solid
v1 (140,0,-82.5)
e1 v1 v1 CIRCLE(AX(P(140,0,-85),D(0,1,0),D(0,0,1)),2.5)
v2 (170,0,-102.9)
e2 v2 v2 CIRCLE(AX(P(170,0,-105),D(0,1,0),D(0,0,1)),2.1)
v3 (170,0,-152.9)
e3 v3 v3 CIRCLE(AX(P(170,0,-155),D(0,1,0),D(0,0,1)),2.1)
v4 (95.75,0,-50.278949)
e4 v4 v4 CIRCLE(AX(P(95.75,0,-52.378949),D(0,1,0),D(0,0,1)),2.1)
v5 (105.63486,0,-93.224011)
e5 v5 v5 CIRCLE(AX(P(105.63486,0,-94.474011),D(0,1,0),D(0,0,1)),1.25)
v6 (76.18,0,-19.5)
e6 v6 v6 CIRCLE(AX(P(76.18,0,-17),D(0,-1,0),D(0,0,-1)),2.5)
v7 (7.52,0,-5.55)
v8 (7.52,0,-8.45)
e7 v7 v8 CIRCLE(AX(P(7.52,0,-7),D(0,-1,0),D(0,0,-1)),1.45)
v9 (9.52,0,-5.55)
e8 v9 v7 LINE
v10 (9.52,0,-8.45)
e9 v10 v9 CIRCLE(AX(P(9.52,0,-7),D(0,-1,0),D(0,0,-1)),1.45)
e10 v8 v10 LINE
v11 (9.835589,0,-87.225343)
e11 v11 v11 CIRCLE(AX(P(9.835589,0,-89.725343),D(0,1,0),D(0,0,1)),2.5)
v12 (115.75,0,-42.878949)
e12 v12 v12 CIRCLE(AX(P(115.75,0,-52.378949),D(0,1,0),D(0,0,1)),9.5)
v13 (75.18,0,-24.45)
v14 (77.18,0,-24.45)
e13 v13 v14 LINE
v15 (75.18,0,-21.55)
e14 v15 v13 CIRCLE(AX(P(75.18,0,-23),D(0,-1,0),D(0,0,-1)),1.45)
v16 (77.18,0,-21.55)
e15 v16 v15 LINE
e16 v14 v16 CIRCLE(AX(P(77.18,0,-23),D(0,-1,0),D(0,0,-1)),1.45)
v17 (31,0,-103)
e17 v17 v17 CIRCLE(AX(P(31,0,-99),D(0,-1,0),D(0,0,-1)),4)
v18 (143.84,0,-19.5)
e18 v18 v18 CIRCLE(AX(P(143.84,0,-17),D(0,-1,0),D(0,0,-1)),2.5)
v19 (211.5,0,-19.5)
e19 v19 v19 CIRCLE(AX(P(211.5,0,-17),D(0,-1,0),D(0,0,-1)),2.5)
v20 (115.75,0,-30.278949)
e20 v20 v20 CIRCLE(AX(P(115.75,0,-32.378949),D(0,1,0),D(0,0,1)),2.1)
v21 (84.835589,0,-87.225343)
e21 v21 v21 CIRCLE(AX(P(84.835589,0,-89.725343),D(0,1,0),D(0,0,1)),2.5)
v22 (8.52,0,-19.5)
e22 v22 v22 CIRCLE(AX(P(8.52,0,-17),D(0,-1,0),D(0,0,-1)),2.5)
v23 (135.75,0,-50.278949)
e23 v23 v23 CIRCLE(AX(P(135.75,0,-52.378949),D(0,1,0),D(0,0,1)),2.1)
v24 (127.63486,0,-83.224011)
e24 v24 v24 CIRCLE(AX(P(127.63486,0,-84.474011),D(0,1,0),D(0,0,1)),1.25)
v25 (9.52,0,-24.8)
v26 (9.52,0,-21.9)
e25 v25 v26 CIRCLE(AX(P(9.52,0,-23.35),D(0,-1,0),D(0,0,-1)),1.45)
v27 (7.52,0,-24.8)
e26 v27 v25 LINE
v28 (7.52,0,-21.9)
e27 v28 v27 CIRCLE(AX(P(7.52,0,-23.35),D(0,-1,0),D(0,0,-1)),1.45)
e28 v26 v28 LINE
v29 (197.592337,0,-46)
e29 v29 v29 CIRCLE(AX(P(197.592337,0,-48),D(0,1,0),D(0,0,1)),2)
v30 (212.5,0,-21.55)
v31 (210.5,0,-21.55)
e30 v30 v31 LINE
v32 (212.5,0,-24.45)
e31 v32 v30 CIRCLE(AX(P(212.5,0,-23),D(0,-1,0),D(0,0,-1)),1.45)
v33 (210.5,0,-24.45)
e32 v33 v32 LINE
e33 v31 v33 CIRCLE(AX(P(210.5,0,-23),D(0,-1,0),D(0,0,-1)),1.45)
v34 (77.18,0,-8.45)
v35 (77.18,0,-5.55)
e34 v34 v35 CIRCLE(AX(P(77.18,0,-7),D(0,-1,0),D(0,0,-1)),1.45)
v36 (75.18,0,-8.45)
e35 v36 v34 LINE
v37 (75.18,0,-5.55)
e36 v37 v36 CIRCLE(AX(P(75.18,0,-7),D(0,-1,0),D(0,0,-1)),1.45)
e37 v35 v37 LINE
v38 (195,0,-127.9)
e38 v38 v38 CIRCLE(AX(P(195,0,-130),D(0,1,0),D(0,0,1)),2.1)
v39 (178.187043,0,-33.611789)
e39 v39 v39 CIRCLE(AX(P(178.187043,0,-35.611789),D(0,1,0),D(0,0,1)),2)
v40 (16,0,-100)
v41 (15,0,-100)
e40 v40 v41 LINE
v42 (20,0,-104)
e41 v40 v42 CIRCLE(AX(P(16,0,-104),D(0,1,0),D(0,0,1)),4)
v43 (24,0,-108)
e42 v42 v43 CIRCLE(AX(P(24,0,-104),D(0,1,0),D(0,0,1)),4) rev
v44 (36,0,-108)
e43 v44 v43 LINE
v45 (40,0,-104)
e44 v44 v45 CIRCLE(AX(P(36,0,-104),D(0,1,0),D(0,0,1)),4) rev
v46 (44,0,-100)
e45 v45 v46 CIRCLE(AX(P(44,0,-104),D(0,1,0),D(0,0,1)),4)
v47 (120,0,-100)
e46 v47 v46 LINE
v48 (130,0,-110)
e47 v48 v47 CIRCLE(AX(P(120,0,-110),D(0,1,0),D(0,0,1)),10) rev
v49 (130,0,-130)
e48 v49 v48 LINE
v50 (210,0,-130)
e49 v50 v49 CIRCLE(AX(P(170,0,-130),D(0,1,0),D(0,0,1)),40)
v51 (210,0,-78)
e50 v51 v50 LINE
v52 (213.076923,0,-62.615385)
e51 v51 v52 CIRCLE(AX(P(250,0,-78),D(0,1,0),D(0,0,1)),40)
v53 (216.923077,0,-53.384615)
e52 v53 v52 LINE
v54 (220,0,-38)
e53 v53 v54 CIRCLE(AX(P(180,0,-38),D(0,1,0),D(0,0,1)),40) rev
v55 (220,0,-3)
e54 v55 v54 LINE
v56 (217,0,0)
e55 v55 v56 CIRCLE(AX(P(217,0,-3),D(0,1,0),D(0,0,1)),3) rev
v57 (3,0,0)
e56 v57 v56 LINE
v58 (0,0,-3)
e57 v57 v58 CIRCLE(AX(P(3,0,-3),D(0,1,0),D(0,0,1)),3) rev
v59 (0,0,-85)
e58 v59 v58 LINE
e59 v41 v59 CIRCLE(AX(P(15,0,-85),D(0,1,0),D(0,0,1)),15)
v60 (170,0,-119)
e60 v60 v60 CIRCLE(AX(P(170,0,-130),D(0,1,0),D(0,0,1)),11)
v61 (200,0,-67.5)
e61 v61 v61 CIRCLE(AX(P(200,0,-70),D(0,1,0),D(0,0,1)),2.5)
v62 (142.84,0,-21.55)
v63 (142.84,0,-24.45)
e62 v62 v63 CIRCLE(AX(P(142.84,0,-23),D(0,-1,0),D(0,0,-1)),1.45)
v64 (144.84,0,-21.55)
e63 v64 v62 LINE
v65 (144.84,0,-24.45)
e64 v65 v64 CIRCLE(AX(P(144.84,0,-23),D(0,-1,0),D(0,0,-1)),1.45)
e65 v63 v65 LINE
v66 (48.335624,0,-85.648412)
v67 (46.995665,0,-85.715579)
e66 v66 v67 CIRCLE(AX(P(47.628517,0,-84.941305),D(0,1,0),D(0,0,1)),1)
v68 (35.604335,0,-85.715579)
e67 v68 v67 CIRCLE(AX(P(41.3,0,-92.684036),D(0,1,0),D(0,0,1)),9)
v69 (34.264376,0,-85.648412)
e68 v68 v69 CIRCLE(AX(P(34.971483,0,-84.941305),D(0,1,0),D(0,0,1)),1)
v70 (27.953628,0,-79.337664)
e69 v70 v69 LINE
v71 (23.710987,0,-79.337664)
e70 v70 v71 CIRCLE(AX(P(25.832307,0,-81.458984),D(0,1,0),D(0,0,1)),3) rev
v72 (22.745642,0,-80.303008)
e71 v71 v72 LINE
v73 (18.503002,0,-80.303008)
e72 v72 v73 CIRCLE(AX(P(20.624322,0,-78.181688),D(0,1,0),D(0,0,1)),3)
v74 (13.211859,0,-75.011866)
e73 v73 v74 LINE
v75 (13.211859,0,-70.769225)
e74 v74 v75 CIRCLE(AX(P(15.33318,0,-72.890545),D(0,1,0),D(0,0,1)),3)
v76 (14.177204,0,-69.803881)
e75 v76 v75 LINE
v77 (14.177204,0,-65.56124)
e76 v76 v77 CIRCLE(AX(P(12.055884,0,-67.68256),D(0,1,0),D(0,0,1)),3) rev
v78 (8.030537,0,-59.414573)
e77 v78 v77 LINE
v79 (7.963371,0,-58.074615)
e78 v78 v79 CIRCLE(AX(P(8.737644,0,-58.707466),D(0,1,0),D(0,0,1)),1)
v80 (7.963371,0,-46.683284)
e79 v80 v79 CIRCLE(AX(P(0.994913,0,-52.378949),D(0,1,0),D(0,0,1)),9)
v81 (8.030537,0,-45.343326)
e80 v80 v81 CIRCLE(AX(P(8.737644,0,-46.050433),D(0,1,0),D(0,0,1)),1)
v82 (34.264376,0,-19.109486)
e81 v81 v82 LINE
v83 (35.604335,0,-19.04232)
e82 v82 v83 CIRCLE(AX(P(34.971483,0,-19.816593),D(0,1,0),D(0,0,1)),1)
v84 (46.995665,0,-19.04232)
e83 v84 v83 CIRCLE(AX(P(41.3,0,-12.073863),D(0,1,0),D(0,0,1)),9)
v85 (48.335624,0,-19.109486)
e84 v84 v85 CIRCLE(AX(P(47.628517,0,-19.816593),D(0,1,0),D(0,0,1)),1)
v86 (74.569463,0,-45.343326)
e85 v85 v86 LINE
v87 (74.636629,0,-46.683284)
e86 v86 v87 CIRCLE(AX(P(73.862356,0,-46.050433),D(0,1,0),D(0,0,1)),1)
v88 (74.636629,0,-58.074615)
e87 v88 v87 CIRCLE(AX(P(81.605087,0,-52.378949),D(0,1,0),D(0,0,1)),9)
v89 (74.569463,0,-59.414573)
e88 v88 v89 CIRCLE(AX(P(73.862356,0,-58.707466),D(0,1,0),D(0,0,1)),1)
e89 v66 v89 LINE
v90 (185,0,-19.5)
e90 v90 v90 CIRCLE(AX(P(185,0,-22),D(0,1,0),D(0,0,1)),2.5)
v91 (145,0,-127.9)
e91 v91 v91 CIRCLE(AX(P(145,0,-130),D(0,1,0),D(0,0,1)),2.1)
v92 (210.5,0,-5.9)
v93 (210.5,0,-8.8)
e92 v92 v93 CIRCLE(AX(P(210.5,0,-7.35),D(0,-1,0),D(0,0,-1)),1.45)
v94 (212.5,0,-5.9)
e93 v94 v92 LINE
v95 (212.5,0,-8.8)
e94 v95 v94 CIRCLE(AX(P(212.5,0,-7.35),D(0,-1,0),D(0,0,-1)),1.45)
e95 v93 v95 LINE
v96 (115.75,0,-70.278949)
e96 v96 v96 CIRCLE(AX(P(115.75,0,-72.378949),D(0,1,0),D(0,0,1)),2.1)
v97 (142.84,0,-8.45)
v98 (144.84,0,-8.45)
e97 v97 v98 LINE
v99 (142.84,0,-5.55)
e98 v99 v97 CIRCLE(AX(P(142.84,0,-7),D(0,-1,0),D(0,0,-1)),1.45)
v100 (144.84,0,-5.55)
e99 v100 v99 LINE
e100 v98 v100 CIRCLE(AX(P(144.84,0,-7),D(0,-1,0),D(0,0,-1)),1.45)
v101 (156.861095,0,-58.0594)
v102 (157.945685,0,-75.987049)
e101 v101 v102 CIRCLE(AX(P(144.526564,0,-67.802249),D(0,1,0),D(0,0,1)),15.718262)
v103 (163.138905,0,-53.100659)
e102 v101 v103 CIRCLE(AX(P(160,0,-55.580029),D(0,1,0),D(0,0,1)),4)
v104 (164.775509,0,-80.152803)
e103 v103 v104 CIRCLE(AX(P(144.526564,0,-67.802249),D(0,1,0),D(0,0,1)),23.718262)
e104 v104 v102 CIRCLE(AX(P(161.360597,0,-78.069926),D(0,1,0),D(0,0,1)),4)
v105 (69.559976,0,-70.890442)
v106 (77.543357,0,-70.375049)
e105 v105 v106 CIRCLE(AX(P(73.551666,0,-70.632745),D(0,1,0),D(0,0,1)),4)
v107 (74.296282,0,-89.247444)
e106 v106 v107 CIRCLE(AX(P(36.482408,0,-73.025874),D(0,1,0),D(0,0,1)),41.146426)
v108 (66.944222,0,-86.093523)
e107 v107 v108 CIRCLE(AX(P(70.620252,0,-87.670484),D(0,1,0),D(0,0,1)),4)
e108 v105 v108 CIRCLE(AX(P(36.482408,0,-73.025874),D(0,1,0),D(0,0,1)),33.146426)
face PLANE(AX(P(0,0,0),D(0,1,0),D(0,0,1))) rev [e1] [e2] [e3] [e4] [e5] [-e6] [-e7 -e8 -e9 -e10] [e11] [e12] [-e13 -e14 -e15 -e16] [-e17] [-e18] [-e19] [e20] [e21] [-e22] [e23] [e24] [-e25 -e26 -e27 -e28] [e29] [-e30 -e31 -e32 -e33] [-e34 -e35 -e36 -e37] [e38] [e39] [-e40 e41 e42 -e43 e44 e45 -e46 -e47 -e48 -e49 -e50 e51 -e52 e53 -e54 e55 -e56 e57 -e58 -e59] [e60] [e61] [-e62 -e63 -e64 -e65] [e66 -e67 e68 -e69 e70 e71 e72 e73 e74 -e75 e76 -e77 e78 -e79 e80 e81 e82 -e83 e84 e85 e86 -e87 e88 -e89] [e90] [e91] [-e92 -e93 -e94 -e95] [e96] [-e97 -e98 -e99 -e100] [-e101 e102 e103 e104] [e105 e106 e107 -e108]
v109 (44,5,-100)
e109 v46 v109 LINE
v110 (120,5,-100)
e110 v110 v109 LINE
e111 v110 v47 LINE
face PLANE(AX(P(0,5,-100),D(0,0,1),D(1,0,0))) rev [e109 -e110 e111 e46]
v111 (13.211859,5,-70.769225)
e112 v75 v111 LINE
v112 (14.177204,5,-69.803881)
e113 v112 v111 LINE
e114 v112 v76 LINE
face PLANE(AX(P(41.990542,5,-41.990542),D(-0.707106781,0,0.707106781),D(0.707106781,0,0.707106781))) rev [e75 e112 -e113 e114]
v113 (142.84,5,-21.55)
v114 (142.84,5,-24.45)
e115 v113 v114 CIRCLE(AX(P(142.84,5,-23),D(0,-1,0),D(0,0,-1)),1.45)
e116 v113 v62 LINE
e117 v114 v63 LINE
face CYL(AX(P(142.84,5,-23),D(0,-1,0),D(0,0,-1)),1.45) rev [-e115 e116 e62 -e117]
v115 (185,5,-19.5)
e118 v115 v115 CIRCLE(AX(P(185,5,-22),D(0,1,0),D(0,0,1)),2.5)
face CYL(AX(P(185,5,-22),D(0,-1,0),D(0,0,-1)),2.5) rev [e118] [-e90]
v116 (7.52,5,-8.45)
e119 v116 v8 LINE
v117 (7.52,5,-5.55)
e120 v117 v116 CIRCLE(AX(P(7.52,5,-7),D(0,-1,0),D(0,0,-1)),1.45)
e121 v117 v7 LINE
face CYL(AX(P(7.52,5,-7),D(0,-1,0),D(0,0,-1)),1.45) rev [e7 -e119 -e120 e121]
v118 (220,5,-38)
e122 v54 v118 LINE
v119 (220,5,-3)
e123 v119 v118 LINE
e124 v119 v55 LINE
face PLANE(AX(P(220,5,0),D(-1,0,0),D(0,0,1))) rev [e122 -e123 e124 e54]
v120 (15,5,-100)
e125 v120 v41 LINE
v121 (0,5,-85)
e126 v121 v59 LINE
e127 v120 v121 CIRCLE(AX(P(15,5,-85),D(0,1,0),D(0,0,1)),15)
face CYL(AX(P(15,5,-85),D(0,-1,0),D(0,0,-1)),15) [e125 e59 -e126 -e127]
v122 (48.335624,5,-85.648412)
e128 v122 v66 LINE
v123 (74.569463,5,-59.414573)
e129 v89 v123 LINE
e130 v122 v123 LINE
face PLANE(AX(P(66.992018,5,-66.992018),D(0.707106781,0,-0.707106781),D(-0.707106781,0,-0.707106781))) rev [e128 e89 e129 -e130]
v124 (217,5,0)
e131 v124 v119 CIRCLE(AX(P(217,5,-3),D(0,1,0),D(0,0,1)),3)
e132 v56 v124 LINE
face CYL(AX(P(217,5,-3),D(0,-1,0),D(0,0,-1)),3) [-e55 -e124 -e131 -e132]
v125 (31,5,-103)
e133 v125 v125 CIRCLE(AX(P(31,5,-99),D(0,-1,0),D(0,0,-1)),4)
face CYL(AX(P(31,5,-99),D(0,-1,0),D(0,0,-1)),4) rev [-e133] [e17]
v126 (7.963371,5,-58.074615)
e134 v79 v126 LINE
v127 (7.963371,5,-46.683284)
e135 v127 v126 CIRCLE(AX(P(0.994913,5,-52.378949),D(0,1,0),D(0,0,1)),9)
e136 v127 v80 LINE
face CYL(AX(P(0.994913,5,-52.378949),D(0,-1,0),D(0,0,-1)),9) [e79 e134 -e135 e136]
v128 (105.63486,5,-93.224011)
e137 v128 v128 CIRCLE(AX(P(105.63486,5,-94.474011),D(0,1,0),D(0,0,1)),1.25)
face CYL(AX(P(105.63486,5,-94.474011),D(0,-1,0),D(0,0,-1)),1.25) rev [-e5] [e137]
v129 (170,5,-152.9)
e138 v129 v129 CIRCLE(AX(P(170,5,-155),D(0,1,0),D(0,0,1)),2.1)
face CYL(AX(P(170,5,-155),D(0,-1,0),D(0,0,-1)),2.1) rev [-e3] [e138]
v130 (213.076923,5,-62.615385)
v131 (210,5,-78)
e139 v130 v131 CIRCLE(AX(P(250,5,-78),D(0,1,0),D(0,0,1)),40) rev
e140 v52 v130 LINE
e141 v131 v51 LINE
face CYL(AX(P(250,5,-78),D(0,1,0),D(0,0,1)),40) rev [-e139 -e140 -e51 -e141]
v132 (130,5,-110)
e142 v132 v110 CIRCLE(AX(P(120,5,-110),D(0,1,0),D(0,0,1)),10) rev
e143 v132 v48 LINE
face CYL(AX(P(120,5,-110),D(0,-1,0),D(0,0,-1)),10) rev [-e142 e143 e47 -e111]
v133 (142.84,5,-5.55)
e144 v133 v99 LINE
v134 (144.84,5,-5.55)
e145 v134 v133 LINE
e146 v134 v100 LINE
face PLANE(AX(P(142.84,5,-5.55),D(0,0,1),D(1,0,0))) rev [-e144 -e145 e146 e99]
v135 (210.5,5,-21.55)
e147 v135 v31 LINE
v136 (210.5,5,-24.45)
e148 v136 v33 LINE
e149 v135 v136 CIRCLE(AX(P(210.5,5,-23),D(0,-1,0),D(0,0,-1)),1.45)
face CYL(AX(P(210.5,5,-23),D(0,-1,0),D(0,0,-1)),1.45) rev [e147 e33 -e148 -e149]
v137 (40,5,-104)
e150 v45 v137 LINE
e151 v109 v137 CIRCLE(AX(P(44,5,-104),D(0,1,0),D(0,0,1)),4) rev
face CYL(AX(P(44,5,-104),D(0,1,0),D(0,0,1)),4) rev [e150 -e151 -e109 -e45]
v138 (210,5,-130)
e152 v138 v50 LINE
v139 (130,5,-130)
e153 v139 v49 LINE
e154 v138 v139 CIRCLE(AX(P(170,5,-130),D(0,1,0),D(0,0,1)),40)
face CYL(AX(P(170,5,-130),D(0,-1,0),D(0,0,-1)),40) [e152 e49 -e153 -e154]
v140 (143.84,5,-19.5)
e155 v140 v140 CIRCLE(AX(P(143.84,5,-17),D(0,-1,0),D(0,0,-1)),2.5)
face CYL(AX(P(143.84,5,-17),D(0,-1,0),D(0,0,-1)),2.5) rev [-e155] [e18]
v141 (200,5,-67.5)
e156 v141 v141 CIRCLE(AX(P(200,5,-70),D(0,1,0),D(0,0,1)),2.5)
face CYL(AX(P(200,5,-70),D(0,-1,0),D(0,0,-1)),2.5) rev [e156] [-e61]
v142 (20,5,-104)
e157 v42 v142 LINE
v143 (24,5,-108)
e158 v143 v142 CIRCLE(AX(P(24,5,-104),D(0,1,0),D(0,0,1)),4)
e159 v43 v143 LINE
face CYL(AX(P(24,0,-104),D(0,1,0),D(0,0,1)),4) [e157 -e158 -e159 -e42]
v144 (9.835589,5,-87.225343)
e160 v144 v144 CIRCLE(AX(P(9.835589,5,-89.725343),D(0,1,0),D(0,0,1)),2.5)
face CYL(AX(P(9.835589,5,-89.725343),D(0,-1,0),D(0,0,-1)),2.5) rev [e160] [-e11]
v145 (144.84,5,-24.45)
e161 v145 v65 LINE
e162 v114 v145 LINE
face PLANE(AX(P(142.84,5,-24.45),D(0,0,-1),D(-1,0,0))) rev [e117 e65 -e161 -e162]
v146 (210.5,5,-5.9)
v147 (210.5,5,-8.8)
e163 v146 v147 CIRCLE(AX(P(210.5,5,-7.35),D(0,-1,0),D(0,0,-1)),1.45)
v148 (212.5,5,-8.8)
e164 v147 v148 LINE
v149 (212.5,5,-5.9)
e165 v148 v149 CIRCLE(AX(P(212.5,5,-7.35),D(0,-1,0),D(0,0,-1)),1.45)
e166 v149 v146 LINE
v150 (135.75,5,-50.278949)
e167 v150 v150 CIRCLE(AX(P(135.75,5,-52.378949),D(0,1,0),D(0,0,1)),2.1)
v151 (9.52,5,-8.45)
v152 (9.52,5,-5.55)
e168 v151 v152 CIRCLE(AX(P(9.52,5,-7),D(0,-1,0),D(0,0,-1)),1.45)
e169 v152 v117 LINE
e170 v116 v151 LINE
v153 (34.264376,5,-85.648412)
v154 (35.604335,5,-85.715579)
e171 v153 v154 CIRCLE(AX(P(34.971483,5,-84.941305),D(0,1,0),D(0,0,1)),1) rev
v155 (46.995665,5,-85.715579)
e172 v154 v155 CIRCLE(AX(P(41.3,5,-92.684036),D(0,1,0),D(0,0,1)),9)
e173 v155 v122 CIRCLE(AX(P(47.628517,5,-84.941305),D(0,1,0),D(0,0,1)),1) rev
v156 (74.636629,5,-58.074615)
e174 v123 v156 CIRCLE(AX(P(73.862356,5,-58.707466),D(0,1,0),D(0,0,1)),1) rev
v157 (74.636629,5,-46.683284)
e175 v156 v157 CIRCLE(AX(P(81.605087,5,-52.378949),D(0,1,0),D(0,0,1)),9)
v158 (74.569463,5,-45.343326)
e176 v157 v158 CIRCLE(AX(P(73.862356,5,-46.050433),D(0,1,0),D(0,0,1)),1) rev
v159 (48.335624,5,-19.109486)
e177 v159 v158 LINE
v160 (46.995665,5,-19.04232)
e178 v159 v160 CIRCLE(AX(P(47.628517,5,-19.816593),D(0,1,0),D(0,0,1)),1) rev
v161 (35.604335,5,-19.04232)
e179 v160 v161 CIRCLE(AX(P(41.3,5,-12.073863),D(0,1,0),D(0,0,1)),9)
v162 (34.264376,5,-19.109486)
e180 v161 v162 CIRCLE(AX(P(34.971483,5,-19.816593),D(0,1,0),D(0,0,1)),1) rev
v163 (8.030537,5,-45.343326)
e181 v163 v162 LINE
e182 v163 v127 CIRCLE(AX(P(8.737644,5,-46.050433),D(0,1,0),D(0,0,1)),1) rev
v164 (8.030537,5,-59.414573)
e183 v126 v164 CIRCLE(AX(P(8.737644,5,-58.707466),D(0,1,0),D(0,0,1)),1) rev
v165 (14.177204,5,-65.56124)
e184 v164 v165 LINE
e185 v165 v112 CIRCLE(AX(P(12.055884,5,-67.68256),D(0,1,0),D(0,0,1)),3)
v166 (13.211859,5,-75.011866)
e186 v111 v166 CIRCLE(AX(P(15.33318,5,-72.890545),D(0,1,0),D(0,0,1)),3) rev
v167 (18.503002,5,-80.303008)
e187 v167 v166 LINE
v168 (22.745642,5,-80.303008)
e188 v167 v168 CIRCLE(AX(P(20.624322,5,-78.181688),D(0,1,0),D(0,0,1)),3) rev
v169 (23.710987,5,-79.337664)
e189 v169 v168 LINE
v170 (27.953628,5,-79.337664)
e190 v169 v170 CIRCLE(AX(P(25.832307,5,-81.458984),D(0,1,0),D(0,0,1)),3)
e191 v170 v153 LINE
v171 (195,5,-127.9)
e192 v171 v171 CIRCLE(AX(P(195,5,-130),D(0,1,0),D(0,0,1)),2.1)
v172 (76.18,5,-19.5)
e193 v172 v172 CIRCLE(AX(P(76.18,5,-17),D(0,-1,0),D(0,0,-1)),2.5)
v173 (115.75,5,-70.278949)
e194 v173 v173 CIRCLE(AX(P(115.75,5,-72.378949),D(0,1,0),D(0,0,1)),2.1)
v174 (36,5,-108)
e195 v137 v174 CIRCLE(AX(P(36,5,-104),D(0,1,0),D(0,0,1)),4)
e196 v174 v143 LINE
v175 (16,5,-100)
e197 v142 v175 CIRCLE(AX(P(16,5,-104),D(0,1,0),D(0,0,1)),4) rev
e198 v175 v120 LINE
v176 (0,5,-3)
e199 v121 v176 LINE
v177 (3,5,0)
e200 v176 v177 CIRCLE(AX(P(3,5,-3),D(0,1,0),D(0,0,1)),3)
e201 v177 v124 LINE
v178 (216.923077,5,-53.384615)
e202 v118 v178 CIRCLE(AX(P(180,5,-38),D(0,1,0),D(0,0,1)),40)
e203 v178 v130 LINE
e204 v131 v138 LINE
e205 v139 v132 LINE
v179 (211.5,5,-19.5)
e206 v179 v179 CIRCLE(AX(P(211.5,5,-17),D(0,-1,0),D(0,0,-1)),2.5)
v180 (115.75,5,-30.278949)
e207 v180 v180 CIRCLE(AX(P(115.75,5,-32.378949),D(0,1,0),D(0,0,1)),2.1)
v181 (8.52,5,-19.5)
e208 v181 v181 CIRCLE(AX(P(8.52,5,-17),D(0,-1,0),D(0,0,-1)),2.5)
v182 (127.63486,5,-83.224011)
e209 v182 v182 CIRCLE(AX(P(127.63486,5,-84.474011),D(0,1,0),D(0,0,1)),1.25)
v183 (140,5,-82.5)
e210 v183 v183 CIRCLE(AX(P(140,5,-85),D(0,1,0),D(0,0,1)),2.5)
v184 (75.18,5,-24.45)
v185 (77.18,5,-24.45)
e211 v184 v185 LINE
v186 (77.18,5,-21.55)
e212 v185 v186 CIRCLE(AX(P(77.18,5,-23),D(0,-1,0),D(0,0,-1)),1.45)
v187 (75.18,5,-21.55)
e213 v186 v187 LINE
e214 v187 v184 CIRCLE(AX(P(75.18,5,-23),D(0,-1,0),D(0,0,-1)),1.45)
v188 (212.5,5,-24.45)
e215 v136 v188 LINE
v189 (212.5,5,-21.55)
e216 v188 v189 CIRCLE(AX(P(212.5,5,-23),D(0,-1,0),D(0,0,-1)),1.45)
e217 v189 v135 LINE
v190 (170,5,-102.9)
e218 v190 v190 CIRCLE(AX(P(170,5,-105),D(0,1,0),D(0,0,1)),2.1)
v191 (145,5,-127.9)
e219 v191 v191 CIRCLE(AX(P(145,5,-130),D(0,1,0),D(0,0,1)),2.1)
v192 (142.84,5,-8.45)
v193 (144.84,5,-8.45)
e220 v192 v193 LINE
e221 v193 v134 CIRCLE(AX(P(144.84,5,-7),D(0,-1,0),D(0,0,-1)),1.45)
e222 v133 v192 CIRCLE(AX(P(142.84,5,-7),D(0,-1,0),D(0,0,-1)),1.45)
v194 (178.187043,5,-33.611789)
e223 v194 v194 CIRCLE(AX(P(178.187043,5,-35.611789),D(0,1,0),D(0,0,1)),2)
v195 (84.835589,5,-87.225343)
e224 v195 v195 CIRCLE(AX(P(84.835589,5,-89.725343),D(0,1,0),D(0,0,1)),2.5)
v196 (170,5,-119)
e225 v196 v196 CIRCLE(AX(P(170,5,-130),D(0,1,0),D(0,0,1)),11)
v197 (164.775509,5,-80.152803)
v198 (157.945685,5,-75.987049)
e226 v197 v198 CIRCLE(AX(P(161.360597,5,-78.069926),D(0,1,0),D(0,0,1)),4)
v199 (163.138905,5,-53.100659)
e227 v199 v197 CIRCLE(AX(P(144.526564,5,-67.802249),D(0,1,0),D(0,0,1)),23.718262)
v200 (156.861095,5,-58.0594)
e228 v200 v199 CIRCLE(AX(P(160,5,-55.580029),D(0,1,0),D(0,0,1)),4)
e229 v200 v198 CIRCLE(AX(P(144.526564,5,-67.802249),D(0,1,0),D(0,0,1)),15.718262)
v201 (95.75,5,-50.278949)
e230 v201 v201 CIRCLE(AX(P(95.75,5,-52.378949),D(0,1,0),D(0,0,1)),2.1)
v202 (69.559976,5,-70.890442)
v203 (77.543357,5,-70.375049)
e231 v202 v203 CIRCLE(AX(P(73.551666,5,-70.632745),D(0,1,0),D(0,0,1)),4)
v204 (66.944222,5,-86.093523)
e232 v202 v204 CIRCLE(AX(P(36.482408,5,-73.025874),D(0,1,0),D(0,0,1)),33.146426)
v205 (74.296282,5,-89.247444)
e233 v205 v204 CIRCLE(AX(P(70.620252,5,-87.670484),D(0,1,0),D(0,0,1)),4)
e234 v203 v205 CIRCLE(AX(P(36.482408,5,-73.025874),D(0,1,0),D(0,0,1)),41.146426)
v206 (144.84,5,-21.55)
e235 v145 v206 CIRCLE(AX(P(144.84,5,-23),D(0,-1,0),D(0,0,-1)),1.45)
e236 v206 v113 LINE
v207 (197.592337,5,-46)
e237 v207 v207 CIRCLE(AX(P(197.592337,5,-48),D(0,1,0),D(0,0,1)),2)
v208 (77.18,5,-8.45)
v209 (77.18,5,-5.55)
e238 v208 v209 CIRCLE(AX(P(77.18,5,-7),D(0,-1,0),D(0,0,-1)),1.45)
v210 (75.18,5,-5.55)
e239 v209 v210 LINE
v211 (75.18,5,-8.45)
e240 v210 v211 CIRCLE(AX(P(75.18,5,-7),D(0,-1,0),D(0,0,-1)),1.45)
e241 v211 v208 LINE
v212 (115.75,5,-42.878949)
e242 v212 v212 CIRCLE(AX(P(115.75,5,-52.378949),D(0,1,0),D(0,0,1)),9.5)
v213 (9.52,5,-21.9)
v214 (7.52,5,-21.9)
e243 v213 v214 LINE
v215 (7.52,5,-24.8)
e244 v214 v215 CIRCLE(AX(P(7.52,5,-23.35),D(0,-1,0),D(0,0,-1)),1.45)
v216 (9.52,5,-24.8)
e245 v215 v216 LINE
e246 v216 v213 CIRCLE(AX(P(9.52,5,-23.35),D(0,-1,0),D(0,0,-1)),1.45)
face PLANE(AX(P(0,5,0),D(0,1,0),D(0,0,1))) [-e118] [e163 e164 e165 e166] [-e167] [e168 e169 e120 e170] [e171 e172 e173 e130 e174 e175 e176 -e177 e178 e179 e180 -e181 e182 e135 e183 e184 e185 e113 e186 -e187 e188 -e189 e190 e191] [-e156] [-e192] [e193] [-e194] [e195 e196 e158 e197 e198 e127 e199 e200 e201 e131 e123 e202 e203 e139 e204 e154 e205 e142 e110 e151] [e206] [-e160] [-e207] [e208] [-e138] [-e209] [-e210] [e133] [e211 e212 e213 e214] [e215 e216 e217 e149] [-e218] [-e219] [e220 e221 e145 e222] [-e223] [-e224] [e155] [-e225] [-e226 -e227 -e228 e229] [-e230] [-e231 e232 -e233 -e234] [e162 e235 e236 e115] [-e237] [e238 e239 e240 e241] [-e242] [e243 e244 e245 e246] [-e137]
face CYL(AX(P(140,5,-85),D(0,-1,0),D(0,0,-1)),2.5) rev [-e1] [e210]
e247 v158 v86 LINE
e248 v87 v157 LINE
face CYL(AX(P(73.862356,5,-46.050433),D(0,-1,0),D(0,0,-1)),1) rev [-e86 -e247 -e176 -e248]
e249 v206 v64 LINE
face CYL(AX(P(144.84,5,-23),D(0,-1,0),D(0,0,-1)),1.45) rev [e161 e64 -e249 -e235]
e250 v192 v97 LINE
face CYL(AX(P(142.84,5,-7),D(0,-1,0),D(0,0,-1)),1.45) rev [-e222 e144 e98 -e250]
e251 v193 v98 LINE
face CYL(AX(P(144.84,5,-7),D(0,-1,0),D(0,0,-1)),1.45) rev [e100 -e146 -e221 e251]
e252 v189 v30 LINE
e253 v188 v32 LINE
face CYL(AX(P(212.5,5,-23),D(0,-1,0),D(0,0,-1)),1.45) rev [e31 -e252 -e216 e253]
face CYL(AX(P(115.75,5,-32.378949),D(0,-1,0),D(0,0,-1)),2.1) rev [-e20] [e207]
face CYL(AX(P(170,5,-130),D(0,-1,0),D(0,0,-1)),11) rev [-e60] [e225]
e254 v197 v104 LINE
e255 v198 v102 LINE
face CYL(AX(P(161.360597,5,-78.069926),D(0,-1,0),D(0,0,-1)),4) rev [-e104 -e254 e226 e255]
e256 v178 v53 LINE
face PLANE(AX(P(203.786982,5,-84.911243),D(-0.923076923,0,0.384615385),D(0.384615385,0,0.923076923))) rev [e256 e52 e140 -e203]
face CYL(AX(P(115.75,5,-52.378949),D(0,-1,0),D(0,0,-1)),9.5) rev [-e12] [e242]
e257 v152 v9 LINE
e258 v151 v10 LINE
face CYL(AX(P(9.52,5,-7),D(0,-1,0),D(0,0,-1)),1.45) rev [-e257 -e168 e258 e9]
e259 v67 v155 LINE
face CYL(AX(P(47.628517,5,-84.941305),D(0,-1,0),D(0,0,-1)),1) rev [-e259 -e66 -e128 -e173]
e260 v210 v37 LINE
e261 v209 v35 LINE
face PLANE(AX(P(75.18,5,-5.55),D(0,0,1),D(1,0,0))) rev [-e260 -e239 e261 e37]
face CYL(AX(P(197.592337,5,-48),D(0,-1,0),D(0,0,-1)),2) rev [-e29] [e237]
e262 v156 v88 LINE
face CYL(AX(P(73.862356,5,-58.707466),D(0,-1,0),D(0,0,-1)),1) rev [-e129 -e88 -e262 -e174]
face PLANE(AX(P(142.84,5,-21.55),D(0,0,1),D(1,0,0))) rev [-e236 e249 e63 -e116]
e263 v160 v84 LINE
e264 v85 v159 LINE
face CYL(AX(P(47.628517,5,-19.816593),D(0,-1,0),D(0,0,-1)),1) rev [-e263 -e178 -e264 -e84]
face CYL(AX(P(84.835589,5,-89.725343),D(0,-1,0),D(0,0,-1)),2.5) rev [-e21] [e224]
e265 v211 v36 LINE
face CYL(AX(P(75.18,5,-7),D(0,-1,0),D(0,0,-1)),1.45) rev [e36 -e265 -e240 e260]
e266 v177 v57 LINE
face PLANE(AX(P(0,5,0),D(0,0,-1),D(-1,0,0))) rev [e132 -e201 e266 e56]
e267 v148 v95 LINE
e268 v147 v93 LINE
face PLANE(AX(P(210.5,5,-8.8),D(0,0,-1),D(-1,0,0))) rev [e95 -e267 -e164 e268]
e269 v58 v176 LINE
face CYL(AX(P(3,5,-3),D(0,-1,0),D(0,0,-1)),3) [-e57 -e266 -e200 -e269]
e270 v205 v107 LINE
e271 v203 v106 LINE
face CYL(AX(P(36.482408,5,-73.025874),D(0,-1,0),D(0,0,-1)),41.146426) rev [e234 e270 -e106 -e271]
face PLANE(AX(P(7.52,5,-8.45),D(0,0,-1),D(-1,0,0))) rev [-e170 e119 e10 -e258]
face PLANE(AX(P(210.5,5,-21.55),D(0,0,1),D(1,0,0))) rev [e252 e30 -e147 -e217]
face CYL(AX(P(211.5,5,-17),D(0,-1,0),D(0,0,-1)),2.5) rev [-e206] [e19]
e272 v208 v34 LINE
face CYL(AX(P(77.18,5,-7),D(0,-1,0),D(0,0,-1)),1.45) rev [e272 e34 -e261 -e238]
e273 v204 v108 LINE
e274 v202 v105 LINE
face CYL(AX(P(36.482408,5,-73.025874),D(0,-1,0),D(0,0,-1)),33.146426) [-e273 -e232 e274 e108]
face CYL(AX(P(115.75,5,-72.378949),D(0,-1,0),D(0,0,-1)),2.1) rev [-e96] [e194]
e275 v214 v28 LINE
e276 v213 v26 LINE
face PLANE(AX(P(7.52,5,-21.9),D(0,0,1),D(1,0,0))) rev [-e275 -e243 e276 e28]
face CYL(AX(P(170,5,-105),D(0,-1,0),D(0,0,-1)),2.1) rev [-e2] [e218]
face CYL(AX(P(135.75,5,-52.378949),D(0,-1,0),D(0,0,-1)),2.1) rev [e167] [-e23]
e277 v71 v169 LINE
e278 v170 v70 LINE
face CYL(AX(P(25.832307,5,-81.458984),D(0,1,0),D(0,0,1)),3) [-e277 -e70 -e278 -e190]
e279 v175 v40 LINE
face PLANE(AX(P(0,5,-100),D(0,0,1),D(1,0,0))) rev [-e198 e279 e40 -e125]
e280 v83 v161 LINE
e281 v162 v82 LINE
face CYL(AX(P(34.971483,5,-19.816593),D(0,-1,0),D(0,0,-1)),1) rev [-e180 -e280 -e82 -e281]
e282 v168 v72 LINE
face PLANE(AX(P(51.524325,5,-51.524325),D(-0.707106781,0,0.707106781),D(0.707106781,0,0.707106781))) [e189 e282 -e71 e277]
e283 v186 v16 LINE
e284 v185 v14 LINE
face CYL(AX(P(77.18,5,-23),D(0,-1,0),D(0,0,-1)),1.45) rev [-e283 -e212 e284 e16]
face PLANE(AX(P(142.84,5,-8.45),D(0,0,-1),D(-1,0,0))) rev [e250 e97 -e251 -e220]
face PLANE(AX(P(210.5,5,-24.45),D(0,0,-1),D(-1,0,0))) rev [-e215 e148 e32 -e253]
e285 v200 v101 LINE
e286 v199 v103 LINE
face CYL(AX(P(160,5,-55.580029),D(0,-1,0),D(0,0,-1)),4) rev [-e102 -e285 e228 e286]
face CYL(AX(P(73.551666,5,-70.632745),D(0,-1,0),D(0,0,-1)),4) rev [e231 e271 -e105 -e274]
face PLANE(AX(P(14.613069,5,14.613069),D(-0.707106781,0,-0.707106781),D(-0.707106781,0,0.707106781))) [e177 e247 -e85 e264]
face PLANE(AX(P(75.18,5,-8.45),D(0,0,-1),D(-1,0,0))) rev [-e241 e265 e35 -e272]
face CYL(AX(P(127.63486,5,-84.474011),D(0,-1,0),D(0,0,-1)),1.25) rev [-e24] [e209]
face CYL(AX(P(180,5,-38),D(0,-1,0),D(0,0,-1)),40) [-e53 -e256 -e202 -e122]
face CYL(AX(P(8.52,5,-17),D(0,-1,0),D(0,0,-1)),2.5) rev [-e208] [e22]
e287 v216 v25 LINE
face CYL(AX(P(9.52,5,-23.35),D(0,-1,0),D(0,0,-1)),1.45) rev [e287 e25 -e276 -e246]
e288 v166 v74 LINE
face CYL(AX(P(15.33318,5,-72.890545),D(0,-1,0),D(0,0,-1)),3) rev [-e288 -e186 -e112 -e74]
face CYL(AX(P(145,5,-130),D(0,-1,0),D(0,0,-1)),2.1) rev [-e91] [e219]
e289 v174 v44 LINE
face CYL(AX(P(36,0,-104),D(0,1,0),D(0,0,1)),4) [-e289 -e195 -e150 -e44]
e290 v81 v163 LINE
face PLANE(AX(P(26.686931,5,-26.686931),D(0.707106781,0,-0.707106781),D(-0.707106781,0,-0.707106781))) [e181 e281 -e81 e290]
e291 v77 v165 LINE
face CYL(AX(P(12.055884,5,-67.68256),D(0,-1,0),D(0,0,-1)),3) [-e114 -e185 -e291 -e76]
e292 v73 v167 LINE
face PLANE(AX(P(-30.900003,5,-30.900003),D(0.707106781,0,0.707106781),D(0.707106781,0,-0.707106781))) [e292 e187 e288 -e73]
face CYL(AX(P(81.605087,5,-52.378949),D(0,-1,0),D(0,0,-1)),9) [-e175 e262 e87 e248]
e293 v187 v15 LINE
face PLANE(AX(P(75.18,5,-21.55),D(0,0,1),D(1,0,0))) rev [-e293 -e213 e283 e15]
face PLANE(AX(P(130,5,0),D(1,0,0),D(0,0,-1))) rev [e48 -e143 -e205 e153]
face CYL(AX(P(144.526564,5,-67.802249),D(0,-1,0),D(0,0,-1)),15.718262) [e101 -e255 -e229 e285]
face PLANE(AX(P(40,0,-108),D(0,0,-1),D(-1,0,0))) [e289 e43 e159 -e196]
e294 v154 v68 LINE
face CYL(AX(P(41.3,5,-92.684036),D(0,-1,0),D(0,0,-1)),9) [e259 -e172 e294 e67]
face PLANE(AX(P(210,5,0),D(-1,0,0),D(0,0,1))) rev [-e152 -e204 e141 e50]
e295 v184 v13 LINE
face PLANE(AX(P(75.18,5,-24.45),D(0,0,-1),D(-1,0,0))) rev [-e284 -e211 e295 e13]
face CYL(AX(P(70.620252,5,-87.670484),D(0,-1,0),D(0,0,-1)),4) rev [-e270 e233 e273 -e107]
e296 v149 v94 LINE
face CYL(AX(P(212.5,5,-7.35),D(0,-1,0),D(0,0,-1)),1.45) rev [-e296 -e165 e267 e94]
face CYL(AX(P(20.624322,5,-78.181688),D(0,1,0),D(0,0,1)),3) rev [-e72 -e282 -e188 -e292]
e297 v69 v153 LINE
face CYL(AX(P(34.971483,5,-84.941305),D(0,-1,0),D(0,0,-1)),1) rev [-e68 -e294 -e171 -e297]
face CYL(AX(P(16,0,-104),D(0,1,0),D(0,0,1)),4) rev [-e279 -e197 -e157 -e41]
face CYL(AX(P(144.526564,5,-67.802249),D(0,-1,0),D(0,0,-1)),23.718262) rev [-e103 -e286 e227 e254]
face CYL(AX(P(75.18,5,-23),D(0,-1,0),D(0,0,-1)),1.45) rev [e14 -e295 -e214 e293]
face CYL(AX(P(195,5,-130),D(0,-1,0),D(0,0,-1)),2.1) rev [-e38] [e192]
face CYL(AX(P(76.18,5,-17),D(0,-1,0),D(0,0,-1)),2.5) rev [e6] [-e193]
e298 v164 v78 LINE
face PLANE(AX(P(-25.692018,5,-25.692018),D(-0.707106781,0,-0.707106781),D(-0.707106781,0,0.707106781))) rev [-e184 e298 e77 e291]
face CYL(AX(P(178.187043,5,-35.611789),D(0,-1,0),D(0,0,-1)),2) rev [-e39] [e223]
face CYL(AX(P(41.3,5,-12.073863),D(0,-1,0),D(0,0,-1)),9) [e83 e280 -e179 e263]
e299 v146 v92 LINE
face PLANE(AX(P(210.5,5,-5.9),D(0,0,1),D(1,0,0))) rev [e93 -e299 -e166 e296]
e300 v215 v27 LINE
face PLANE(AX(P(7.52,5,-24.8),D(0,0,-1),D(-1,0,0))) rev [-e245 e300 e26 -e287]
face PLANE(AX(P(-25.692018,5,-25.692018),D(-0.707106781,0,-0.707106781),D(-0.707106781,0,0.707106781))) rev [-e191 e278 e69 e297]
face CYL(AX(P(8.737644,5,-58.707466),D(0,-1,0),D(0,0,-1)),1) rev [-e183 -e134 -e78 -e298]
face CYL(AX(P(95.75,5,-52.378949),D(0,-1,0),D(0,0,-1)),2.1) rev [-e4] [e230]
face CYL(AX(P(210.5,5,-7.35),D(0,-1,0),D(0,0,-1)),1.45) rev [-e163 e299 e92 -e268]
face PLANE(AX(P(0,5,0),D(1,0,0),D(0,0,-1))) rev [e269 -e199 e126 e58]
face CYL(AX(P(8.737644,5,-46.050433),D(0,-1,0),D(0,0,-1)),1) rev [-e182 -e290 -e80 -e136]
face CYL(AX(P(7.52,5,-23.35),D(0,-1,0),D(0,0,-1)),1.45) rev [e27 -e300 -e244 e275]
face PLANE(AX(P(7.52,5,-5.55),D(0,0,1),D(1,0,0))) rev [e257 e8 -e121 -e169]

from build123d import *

# Parameters (mm, degrees)
SKETCH1_R           = 2.1
SKETCH1_R_2         = 2.5
SKETCH1_R_3         = 2
SKETCH1_R_4         = 9.5
SKETCH1_R_5         = 1.25
SKETCH1_R_6         = 11
BOSS_EXTRUDE1_DEPTH = 5
SKETCH18_R          = 2.5
CUT_EXTRUDE15_DEPTH = 483.844656179
FILLET2_R           = 40
FILLET3_R           = 40
SKETCH21_W          = 20
SKETCH21_H          = 8
BOSS_EXTRUDE3_DEPTH = 5
SKETCH20_R          = 4
CUT_EXTRUDE17_DEPTH = 279.07373123
FILLET5_R           = 1
FILLET6_R           = 3
FILLET7_R           = 4
FILLET8_R           = 3


with BuildPart() as part:
    # Sketch1 → Boss-Extrude1 (new body)
    with BuildSketch(Plane(origin=(0, 0, 0), x_dir=(1, 0, 0), z_dir=(0, 1, 0))):
        with BuildLine():
            Line((0, 85), (0, 0))
            Line((0, 0), (220, 0))
            Line((220, 0), (220, 46))
            Line((220, 46), (210, 70))
            Line((210, 70), (210, 130))
            ThreePointArc((210, 130), (170, 170), (130, 130))
            Line((130, 130), (130, 110))
            ThreePointArc((130, 110), (127.071067812, 102.928932188), (120, 100))
            Line((120, 100), (15, 100))
            ThreePointArc((15, 100), (4.393398282, 95.606601718), (0, 85))
        make_face()
        with BuildLine():
            ThreePointArc((7.358874503, 46.014988345), (9.994913472, 52.378949376), (7.358874503, 58.742910407))
            Line((7.358874503, 58.742910407), (16.298524283, 67.682560186))
            Line((16.298524283, 67.682560186), (11.09053907, 72.890545399))
            Line((11.09053907, 72.890545399), (20.624322085, 82.424328414))
            Line((20.624322085, 82.424328414), (25.832307298, 77.216343201))
            Line((25.832307298, 77.216343201), (34.936038969, 86.320074873))
            ThreePointArc((34.936038969, 86.320074873), (41.3, 83.684035903), (47.663961031, 86.320074873))
            Line((47.663961031, 86.320074873), (75.241125497, 58.742910407))
            ThreePointArc((75.241125497, 58.742910407), (72.605086528, 52.378949376), (75.241125497, 46.014988345))
            Line((75.241125497, 46.014988345), (47.663961031, 18.437823879))
            ThreePointArc((47.663961031, 18.437823879), (41.3, 21.073862848), (34.936038969, 18.437823879))
            Line((34.936038969, 18.437823879), (7.358874503, 46.014988345))
        make_face(mode=Mode.SUBTRACT)
        with Locations(Location((95.75, 52.378949376, 0), (0, 0, 270))):
            Circle(SKETCH1_R, mode=Mode.SUBTRACT)
        with BuildLine():
            ThreePointArc((77.543356768, 70.375048681), (73.293969574, 66.641055044), (69.559975938, 70.890442238))
            ThreePointArc((69.559975938, 70.890442238), (69.148853816, 78.646273201), (66.944221963, 86.093523278))
            ThreePointArc((66.944221963, 86.093523278), (69.043291634, 91.346513523), (74.296281879, 89.247443853))
            ThreePointArc((74.296281879, 89.247443853), (77.033008956, 80.00277522), (77.543356768, 70.375048681))
        make_face(mode=Mode.SUBTRACT)
        with Locations(Location((115.75, 32.378949376, 0), (0, 0, 270))):
            Circle(SKETCH1_R, mode=Mode.SUBTRACT)
        with Locations(Location((185, 22, 0), (0, 0, 270))):
            Circle(SKETCH1_R_2, mode=Mode.SUBTRACT)
        with Locations(Location((178.187043017, 35.611788831, 0), (0, 0, 270))):
            Circle(SKETCH1_R_3, mode=Mode.SUBTRACT)
        with Locations(Location((115.75, 52.378949376, 0), (0, 0, 270))):
            Circle(SKETCH1_R_4, mode=Mode.SUBTRACT)
        with Locations(Location((135.75, 52.378949376, 0), (0, 0, 270))):
            Circle(SKETCH1_R, mode=Mode.SUBTRACT)
        with Locations(Location((115.75, 72.378949376, 0), (0, 0, 270))):
            Circle(SKETCH1_R, mode=Mode.SUBTRACT)
        with Locations(Location((127.63485968, 84.474011316, 0), (0, 0, 270))):
            Circle(SKETCH1_R_5, mode=Mode.SUBTRACT)
        with BuildLine():
            ThreePointArc((157.94568485, 75.987049461), (159.277720174, 81.48483828), (164.775508993, 80.152802956))
            ThreePointArc((164.775508993, 80.152802956), (168.201540304, 66.369956658), (163.138904601, 53.100658923))
            ThreePointArc((163.138904601, 53.100658923), (157.520629535, 52.441124786), (156.861095398, 58.059399852))
            ThreePointArc((156.861095398, 58.059399852), (160.216140338, 66.853058501), (157.94568485, 75.987049461))
        make_face(mode=Mode.SUBTRACT)
        with Locations(Location((197.592337166, 48, 0), (0, 0, 270))):
            Circle(SKETCH1_R_3, mode=Mode.SUBTRACT)
        with Locations(Location((200, 70, 0), (0, 0, 270))):
            Circle(SKETCH1_R_2, mode=Mode.SUBTRACT)
        with Locations(Location((9.83558927, 89.725342507, 0), (0, 0, 270))):
            Circle(SKETCH1_R_2, mode=Mode.SUBTRACT)
        with Locations(Location((84.83558927, 89.725342507, 0), (0, 0, 270))):
            Circle(SKETCH1_R_2, mode=Mode.SUBTRACT)
        with Locations(Location((105.63485968, 94.474011316, 0), (0, 0, 270))):
            Circle(SKETCH1_R_5, mode=Mode.SUBTRACT)
        with Locations(Location((140, 85, 0), (0, 0, 270))):
            Circle(SKETCH1_R_2, mode=Mode.SUBTRACT)
        with Locations(Location((170, 105, 0), (0, 0, 270))):
            Circle(SKETCH1_R, mode=Mode.SUBTRACT)
        with Locations(Location((145, 130, 0), (0, 0, 270))):
            Circle(SKETCH1_R, mode=Mode.SUBTRACT)
        with Locations(Location((170, 130, 0), (0, 0, 270))):
            Circle(SKETCH1_R_6, mode=Mode.SUBTRACT)
        with Locations(Location((195, 130, 0), (0, 0, 270))):
            Circle(SKETCH1_R, mode=Mode.SUBTRACT)
        with Locations(Location((170, 155, 0), (0, 0, 270))):
            Circle(SKETCH1_R, mode=Mode.SUBTRACT)
    extrude(amount=BOSS_EXTRUDE1_DEPTH)

    # Sketch18 → Cut-Extrude15 (cut, through all)
    with BuildSketch(Plane(origin=(300.638016231, 0, 207.797227621), x_dir=(-1, 0, 0), z_dir=(0, -1, 0))):
        with Locations(Location((292.118016257, 224.797227621, 0), (0, 0, 90))):
            Circle(SKETCH18_R)
        with Locations(Location((224.458016257, 224.797227621, 0), (0, 0, 90))):
            Circle(SKETCH18_R)
        with Locations(Location((156.798016257, 224.797227621, 0), (0, 0, 90))):
            Circle(SKETCH18_R)
        with Locations(Location((89.138016257, 224.797227621, 0), (0, 0, 90))):
            Circle(SKETCH18_R)
        with BuildLine():
            Line((293.118016257, 229.697227621), (291.118016257, 229.697227621))
            ThreePointArc((291.118016257, 229.697227621), (289.668016257, 231.147227621), (291.118016257, 232.597227621))
            Line((291.118016257, 232.597227621), (293.118016257, 232.597227621))
            ThreePointArc((293.118016257, 232.597227621), (294.568016257, 231.147227621), (293.118016257, 229.697227621))
        make_face()
        with BuildLine():
            Line((293.118016257, 213.347227621), (291.118016257, 213.347227621))
            ThreePointArc((291.118016257, 213.347227621), (289.668016257, 214.797227621), (291.118016257, 216.247227621))
            Line((291.118016257, 216.247227621), (293.118016257, 216.247227621))
            ThreePointArc((293.118016257, 216.247227621), (294.568016257, 214.797227621), (293.118016257, 213.347227621))
        make_face()
        with BuildLine():
            Line((225.458016257, 229.347227621), (223.458016257, 229.347227621))
            ThreePointArc((223.458016257, 229.347227621), (222.008016257, 230.797227621), (223.458016257, 232.247227621))
            Line((223.458016257, 232.247227621), (225.458016257, 232.247227621))
            ThreePointArc((225.458016257, 232.247227621), (226.908016257, 230.797227621), (225.458016257, 229.347227621))
        make_face()
        with BuildLine():
            Line((225.458016257, 213.347227621), (223.458016257, 213.347227621))
            ThreePointArc((223.458016257, 213.347227621), (222.008016257, 214.797227621), (223.458016257, 216.247227621))
            Line((223.458016257, 216.247227621), (225.458016257, 216.247227621))
            ThreePointArc((225.458016257, 216.247227621), (226.908016257, 214.797227621), (225.458016257, 213.347227621))
        make_face()
        with BuildLine():
            Line((157.798016257, 229.347227621), (155.798016257, 229.347227621))
            ThreePointArc((155.798016257, 229.347227621), (154.348016257, 230.797227621), (155.798016257, 232.247227621))
            Line((155.798016257, 232.247227621), (157.798016257, 232.247227621))
            ThreePointArc((157.798016257, 232.247227621), (159.248016257, 230.797227621), (157.798016257, 229.347227621))
        make_face()
        with BuildLine():
            Line((157.798016257, 213.347227621), (155.798016257, 213.347227621))
            ThreePointArc((155.798016257, 213.347227621), (154.348016257, 214.797227621), (155.798016257, 216.247227621))
            Line((155.798016257, 216.247227621), (157.798016257, 216.247227621))
            ThreePointArc((157.798016257, 216.247227621), (159.248016257, 214.797227621), (157.798016257, 213.347227621))
        make_face()
        with BuildLine():
            Line((90.138016257, 229.347227621), (88.138016257, 229.347227621))
            ThreePointArc((88.138016257, 229.347227621), (86.688016257, 230.797227621), (88.138016257, 232.247227621))
            Line((88.138016257, 232.247227621), (90.138016257, 232.247227621))
            ThreePointArc((90.138016257, 232.247227621), (91.588016257, 230.797227621), (90.138016257, 229.347227621))
        make_face()
        with BuildLine():
            Line((90.138016257, 213.697227621), (88.138016257, 213.697227621))
            ThreePointArc((88.138016257, 213.697227621), (86.688016257, 215.147227621), (88.138016257, 216.597227621))
            Line((88.138016257, 216.597227621), (90.138016257, 216.597227621))
            ThreePointArc((90.138016257, 216.597227621), (91.588016257, 215.147227621), (90.138016257, 213.697227621))
        make_face()
    extrude(amount=-CUT_EXTRUDE15_DEPTH, mode=Mode.SUBTRACT)

    # Fillet2
    fillet2_edges = [part.edges().sort_by_distance(p)[0] for p in [
        (210, 2.5, -70),
    ]]
    fillet(fillet2_edges, radius=FILLET2_R)

    # Fillet3
    fillet3_edges = [part.edges().sort_by_distance(p)[0] for p in [
        (220, 2.5, -46),
    ]]
    fillet(fillet3_edges, radius=FILLET3_R)

    # Sketch21 → Boss-Extrude3 (add)
    with BuildSketch(Plane(origin=(0, 5, 0), x_dir=(1, 0, 0), z_dir=(0, 1, 0))):
        with Locations((30, 104)):
            Rectangle(SKETCH21_W, SKETCH21_H)
    extrude(amount=-BOSS_EXTRUDE3_DEPTH)

    # Sketch20 → Cut-Extrude17 (cut, through all)
    with BuildSketch(Plane(origin=(0, 0, 0), x_dir=(-1, 0, 0), z_dir=(0, -1, 0))):
        with Locations(Location((-31, 99, 0), (0, 0, 90))):
            Circle(SKETCH20_R)
    extrude(amount=-CUT_EXTRUDE17_DEPTH, mode=Mode.SUBTRACT)

    # Fillet5
    fillet5_edges = [part.edges().sort_by_distance(p)[0] for p in [
        (75.241125497, 2.5, -46.014988345),
        (75.241125497, 2.5, -58.742910407),
        (47.663961031, 2.5, -86.320074873),
        (34.936038969, 2.5, -86.320074873),
        (7.358874503, 2.5, -58.742910407),
        (7.358874503, 2.5, -46.014988345),
        (34.936038969, 2.5, -18.437823879),
        (47.663961031, 2.5, -18.437823879),
    ]]
    fillet(fillet5_edges, radius=FILLET5_R)

    # Fillet6
    fillet6_edges = [part.edges().sort_by_distance(p)[0] for p in [
        (25.832307298, 2.5, -77.216343201),
        (20.624322085, 2.5, -82.424328414),
        (11.09053907, 2.5, -72.890545399),
        (16.298524283, 2.5, -67.682560186),
    ]]
    fillet(fillet6_edges, radius=FILLET6_R)

    # Fillet7
    fillet7_edges = [part.edges().sort_by_distance(p)[0] for p in [
        (40, 2.5, -100),
        (20, 2.5, -100),
    ]]
    fillet(fillet7_edges, radius=FILLET7_R)
    fillet7_2_edges = [part.edges().sort_by_distance(p)[0] for p in [
        (40, 2.5, -108),
        (20, 2.5, -108),
    ]]
    fillet(fillet7_2_edges, radius=FILLET7_R - 0.0001)  # a hair under: the kernel refuses the full size

    # Fillet8
    fillet8_edges = [part.edges().sort_by_distance(p)[0] for p in [
        (220, 2.5, 0),
        (0, 2.5, 0),
    ]]
    fillet(fillet8_edges, radius=FILLET8_R)


solid = part.part
